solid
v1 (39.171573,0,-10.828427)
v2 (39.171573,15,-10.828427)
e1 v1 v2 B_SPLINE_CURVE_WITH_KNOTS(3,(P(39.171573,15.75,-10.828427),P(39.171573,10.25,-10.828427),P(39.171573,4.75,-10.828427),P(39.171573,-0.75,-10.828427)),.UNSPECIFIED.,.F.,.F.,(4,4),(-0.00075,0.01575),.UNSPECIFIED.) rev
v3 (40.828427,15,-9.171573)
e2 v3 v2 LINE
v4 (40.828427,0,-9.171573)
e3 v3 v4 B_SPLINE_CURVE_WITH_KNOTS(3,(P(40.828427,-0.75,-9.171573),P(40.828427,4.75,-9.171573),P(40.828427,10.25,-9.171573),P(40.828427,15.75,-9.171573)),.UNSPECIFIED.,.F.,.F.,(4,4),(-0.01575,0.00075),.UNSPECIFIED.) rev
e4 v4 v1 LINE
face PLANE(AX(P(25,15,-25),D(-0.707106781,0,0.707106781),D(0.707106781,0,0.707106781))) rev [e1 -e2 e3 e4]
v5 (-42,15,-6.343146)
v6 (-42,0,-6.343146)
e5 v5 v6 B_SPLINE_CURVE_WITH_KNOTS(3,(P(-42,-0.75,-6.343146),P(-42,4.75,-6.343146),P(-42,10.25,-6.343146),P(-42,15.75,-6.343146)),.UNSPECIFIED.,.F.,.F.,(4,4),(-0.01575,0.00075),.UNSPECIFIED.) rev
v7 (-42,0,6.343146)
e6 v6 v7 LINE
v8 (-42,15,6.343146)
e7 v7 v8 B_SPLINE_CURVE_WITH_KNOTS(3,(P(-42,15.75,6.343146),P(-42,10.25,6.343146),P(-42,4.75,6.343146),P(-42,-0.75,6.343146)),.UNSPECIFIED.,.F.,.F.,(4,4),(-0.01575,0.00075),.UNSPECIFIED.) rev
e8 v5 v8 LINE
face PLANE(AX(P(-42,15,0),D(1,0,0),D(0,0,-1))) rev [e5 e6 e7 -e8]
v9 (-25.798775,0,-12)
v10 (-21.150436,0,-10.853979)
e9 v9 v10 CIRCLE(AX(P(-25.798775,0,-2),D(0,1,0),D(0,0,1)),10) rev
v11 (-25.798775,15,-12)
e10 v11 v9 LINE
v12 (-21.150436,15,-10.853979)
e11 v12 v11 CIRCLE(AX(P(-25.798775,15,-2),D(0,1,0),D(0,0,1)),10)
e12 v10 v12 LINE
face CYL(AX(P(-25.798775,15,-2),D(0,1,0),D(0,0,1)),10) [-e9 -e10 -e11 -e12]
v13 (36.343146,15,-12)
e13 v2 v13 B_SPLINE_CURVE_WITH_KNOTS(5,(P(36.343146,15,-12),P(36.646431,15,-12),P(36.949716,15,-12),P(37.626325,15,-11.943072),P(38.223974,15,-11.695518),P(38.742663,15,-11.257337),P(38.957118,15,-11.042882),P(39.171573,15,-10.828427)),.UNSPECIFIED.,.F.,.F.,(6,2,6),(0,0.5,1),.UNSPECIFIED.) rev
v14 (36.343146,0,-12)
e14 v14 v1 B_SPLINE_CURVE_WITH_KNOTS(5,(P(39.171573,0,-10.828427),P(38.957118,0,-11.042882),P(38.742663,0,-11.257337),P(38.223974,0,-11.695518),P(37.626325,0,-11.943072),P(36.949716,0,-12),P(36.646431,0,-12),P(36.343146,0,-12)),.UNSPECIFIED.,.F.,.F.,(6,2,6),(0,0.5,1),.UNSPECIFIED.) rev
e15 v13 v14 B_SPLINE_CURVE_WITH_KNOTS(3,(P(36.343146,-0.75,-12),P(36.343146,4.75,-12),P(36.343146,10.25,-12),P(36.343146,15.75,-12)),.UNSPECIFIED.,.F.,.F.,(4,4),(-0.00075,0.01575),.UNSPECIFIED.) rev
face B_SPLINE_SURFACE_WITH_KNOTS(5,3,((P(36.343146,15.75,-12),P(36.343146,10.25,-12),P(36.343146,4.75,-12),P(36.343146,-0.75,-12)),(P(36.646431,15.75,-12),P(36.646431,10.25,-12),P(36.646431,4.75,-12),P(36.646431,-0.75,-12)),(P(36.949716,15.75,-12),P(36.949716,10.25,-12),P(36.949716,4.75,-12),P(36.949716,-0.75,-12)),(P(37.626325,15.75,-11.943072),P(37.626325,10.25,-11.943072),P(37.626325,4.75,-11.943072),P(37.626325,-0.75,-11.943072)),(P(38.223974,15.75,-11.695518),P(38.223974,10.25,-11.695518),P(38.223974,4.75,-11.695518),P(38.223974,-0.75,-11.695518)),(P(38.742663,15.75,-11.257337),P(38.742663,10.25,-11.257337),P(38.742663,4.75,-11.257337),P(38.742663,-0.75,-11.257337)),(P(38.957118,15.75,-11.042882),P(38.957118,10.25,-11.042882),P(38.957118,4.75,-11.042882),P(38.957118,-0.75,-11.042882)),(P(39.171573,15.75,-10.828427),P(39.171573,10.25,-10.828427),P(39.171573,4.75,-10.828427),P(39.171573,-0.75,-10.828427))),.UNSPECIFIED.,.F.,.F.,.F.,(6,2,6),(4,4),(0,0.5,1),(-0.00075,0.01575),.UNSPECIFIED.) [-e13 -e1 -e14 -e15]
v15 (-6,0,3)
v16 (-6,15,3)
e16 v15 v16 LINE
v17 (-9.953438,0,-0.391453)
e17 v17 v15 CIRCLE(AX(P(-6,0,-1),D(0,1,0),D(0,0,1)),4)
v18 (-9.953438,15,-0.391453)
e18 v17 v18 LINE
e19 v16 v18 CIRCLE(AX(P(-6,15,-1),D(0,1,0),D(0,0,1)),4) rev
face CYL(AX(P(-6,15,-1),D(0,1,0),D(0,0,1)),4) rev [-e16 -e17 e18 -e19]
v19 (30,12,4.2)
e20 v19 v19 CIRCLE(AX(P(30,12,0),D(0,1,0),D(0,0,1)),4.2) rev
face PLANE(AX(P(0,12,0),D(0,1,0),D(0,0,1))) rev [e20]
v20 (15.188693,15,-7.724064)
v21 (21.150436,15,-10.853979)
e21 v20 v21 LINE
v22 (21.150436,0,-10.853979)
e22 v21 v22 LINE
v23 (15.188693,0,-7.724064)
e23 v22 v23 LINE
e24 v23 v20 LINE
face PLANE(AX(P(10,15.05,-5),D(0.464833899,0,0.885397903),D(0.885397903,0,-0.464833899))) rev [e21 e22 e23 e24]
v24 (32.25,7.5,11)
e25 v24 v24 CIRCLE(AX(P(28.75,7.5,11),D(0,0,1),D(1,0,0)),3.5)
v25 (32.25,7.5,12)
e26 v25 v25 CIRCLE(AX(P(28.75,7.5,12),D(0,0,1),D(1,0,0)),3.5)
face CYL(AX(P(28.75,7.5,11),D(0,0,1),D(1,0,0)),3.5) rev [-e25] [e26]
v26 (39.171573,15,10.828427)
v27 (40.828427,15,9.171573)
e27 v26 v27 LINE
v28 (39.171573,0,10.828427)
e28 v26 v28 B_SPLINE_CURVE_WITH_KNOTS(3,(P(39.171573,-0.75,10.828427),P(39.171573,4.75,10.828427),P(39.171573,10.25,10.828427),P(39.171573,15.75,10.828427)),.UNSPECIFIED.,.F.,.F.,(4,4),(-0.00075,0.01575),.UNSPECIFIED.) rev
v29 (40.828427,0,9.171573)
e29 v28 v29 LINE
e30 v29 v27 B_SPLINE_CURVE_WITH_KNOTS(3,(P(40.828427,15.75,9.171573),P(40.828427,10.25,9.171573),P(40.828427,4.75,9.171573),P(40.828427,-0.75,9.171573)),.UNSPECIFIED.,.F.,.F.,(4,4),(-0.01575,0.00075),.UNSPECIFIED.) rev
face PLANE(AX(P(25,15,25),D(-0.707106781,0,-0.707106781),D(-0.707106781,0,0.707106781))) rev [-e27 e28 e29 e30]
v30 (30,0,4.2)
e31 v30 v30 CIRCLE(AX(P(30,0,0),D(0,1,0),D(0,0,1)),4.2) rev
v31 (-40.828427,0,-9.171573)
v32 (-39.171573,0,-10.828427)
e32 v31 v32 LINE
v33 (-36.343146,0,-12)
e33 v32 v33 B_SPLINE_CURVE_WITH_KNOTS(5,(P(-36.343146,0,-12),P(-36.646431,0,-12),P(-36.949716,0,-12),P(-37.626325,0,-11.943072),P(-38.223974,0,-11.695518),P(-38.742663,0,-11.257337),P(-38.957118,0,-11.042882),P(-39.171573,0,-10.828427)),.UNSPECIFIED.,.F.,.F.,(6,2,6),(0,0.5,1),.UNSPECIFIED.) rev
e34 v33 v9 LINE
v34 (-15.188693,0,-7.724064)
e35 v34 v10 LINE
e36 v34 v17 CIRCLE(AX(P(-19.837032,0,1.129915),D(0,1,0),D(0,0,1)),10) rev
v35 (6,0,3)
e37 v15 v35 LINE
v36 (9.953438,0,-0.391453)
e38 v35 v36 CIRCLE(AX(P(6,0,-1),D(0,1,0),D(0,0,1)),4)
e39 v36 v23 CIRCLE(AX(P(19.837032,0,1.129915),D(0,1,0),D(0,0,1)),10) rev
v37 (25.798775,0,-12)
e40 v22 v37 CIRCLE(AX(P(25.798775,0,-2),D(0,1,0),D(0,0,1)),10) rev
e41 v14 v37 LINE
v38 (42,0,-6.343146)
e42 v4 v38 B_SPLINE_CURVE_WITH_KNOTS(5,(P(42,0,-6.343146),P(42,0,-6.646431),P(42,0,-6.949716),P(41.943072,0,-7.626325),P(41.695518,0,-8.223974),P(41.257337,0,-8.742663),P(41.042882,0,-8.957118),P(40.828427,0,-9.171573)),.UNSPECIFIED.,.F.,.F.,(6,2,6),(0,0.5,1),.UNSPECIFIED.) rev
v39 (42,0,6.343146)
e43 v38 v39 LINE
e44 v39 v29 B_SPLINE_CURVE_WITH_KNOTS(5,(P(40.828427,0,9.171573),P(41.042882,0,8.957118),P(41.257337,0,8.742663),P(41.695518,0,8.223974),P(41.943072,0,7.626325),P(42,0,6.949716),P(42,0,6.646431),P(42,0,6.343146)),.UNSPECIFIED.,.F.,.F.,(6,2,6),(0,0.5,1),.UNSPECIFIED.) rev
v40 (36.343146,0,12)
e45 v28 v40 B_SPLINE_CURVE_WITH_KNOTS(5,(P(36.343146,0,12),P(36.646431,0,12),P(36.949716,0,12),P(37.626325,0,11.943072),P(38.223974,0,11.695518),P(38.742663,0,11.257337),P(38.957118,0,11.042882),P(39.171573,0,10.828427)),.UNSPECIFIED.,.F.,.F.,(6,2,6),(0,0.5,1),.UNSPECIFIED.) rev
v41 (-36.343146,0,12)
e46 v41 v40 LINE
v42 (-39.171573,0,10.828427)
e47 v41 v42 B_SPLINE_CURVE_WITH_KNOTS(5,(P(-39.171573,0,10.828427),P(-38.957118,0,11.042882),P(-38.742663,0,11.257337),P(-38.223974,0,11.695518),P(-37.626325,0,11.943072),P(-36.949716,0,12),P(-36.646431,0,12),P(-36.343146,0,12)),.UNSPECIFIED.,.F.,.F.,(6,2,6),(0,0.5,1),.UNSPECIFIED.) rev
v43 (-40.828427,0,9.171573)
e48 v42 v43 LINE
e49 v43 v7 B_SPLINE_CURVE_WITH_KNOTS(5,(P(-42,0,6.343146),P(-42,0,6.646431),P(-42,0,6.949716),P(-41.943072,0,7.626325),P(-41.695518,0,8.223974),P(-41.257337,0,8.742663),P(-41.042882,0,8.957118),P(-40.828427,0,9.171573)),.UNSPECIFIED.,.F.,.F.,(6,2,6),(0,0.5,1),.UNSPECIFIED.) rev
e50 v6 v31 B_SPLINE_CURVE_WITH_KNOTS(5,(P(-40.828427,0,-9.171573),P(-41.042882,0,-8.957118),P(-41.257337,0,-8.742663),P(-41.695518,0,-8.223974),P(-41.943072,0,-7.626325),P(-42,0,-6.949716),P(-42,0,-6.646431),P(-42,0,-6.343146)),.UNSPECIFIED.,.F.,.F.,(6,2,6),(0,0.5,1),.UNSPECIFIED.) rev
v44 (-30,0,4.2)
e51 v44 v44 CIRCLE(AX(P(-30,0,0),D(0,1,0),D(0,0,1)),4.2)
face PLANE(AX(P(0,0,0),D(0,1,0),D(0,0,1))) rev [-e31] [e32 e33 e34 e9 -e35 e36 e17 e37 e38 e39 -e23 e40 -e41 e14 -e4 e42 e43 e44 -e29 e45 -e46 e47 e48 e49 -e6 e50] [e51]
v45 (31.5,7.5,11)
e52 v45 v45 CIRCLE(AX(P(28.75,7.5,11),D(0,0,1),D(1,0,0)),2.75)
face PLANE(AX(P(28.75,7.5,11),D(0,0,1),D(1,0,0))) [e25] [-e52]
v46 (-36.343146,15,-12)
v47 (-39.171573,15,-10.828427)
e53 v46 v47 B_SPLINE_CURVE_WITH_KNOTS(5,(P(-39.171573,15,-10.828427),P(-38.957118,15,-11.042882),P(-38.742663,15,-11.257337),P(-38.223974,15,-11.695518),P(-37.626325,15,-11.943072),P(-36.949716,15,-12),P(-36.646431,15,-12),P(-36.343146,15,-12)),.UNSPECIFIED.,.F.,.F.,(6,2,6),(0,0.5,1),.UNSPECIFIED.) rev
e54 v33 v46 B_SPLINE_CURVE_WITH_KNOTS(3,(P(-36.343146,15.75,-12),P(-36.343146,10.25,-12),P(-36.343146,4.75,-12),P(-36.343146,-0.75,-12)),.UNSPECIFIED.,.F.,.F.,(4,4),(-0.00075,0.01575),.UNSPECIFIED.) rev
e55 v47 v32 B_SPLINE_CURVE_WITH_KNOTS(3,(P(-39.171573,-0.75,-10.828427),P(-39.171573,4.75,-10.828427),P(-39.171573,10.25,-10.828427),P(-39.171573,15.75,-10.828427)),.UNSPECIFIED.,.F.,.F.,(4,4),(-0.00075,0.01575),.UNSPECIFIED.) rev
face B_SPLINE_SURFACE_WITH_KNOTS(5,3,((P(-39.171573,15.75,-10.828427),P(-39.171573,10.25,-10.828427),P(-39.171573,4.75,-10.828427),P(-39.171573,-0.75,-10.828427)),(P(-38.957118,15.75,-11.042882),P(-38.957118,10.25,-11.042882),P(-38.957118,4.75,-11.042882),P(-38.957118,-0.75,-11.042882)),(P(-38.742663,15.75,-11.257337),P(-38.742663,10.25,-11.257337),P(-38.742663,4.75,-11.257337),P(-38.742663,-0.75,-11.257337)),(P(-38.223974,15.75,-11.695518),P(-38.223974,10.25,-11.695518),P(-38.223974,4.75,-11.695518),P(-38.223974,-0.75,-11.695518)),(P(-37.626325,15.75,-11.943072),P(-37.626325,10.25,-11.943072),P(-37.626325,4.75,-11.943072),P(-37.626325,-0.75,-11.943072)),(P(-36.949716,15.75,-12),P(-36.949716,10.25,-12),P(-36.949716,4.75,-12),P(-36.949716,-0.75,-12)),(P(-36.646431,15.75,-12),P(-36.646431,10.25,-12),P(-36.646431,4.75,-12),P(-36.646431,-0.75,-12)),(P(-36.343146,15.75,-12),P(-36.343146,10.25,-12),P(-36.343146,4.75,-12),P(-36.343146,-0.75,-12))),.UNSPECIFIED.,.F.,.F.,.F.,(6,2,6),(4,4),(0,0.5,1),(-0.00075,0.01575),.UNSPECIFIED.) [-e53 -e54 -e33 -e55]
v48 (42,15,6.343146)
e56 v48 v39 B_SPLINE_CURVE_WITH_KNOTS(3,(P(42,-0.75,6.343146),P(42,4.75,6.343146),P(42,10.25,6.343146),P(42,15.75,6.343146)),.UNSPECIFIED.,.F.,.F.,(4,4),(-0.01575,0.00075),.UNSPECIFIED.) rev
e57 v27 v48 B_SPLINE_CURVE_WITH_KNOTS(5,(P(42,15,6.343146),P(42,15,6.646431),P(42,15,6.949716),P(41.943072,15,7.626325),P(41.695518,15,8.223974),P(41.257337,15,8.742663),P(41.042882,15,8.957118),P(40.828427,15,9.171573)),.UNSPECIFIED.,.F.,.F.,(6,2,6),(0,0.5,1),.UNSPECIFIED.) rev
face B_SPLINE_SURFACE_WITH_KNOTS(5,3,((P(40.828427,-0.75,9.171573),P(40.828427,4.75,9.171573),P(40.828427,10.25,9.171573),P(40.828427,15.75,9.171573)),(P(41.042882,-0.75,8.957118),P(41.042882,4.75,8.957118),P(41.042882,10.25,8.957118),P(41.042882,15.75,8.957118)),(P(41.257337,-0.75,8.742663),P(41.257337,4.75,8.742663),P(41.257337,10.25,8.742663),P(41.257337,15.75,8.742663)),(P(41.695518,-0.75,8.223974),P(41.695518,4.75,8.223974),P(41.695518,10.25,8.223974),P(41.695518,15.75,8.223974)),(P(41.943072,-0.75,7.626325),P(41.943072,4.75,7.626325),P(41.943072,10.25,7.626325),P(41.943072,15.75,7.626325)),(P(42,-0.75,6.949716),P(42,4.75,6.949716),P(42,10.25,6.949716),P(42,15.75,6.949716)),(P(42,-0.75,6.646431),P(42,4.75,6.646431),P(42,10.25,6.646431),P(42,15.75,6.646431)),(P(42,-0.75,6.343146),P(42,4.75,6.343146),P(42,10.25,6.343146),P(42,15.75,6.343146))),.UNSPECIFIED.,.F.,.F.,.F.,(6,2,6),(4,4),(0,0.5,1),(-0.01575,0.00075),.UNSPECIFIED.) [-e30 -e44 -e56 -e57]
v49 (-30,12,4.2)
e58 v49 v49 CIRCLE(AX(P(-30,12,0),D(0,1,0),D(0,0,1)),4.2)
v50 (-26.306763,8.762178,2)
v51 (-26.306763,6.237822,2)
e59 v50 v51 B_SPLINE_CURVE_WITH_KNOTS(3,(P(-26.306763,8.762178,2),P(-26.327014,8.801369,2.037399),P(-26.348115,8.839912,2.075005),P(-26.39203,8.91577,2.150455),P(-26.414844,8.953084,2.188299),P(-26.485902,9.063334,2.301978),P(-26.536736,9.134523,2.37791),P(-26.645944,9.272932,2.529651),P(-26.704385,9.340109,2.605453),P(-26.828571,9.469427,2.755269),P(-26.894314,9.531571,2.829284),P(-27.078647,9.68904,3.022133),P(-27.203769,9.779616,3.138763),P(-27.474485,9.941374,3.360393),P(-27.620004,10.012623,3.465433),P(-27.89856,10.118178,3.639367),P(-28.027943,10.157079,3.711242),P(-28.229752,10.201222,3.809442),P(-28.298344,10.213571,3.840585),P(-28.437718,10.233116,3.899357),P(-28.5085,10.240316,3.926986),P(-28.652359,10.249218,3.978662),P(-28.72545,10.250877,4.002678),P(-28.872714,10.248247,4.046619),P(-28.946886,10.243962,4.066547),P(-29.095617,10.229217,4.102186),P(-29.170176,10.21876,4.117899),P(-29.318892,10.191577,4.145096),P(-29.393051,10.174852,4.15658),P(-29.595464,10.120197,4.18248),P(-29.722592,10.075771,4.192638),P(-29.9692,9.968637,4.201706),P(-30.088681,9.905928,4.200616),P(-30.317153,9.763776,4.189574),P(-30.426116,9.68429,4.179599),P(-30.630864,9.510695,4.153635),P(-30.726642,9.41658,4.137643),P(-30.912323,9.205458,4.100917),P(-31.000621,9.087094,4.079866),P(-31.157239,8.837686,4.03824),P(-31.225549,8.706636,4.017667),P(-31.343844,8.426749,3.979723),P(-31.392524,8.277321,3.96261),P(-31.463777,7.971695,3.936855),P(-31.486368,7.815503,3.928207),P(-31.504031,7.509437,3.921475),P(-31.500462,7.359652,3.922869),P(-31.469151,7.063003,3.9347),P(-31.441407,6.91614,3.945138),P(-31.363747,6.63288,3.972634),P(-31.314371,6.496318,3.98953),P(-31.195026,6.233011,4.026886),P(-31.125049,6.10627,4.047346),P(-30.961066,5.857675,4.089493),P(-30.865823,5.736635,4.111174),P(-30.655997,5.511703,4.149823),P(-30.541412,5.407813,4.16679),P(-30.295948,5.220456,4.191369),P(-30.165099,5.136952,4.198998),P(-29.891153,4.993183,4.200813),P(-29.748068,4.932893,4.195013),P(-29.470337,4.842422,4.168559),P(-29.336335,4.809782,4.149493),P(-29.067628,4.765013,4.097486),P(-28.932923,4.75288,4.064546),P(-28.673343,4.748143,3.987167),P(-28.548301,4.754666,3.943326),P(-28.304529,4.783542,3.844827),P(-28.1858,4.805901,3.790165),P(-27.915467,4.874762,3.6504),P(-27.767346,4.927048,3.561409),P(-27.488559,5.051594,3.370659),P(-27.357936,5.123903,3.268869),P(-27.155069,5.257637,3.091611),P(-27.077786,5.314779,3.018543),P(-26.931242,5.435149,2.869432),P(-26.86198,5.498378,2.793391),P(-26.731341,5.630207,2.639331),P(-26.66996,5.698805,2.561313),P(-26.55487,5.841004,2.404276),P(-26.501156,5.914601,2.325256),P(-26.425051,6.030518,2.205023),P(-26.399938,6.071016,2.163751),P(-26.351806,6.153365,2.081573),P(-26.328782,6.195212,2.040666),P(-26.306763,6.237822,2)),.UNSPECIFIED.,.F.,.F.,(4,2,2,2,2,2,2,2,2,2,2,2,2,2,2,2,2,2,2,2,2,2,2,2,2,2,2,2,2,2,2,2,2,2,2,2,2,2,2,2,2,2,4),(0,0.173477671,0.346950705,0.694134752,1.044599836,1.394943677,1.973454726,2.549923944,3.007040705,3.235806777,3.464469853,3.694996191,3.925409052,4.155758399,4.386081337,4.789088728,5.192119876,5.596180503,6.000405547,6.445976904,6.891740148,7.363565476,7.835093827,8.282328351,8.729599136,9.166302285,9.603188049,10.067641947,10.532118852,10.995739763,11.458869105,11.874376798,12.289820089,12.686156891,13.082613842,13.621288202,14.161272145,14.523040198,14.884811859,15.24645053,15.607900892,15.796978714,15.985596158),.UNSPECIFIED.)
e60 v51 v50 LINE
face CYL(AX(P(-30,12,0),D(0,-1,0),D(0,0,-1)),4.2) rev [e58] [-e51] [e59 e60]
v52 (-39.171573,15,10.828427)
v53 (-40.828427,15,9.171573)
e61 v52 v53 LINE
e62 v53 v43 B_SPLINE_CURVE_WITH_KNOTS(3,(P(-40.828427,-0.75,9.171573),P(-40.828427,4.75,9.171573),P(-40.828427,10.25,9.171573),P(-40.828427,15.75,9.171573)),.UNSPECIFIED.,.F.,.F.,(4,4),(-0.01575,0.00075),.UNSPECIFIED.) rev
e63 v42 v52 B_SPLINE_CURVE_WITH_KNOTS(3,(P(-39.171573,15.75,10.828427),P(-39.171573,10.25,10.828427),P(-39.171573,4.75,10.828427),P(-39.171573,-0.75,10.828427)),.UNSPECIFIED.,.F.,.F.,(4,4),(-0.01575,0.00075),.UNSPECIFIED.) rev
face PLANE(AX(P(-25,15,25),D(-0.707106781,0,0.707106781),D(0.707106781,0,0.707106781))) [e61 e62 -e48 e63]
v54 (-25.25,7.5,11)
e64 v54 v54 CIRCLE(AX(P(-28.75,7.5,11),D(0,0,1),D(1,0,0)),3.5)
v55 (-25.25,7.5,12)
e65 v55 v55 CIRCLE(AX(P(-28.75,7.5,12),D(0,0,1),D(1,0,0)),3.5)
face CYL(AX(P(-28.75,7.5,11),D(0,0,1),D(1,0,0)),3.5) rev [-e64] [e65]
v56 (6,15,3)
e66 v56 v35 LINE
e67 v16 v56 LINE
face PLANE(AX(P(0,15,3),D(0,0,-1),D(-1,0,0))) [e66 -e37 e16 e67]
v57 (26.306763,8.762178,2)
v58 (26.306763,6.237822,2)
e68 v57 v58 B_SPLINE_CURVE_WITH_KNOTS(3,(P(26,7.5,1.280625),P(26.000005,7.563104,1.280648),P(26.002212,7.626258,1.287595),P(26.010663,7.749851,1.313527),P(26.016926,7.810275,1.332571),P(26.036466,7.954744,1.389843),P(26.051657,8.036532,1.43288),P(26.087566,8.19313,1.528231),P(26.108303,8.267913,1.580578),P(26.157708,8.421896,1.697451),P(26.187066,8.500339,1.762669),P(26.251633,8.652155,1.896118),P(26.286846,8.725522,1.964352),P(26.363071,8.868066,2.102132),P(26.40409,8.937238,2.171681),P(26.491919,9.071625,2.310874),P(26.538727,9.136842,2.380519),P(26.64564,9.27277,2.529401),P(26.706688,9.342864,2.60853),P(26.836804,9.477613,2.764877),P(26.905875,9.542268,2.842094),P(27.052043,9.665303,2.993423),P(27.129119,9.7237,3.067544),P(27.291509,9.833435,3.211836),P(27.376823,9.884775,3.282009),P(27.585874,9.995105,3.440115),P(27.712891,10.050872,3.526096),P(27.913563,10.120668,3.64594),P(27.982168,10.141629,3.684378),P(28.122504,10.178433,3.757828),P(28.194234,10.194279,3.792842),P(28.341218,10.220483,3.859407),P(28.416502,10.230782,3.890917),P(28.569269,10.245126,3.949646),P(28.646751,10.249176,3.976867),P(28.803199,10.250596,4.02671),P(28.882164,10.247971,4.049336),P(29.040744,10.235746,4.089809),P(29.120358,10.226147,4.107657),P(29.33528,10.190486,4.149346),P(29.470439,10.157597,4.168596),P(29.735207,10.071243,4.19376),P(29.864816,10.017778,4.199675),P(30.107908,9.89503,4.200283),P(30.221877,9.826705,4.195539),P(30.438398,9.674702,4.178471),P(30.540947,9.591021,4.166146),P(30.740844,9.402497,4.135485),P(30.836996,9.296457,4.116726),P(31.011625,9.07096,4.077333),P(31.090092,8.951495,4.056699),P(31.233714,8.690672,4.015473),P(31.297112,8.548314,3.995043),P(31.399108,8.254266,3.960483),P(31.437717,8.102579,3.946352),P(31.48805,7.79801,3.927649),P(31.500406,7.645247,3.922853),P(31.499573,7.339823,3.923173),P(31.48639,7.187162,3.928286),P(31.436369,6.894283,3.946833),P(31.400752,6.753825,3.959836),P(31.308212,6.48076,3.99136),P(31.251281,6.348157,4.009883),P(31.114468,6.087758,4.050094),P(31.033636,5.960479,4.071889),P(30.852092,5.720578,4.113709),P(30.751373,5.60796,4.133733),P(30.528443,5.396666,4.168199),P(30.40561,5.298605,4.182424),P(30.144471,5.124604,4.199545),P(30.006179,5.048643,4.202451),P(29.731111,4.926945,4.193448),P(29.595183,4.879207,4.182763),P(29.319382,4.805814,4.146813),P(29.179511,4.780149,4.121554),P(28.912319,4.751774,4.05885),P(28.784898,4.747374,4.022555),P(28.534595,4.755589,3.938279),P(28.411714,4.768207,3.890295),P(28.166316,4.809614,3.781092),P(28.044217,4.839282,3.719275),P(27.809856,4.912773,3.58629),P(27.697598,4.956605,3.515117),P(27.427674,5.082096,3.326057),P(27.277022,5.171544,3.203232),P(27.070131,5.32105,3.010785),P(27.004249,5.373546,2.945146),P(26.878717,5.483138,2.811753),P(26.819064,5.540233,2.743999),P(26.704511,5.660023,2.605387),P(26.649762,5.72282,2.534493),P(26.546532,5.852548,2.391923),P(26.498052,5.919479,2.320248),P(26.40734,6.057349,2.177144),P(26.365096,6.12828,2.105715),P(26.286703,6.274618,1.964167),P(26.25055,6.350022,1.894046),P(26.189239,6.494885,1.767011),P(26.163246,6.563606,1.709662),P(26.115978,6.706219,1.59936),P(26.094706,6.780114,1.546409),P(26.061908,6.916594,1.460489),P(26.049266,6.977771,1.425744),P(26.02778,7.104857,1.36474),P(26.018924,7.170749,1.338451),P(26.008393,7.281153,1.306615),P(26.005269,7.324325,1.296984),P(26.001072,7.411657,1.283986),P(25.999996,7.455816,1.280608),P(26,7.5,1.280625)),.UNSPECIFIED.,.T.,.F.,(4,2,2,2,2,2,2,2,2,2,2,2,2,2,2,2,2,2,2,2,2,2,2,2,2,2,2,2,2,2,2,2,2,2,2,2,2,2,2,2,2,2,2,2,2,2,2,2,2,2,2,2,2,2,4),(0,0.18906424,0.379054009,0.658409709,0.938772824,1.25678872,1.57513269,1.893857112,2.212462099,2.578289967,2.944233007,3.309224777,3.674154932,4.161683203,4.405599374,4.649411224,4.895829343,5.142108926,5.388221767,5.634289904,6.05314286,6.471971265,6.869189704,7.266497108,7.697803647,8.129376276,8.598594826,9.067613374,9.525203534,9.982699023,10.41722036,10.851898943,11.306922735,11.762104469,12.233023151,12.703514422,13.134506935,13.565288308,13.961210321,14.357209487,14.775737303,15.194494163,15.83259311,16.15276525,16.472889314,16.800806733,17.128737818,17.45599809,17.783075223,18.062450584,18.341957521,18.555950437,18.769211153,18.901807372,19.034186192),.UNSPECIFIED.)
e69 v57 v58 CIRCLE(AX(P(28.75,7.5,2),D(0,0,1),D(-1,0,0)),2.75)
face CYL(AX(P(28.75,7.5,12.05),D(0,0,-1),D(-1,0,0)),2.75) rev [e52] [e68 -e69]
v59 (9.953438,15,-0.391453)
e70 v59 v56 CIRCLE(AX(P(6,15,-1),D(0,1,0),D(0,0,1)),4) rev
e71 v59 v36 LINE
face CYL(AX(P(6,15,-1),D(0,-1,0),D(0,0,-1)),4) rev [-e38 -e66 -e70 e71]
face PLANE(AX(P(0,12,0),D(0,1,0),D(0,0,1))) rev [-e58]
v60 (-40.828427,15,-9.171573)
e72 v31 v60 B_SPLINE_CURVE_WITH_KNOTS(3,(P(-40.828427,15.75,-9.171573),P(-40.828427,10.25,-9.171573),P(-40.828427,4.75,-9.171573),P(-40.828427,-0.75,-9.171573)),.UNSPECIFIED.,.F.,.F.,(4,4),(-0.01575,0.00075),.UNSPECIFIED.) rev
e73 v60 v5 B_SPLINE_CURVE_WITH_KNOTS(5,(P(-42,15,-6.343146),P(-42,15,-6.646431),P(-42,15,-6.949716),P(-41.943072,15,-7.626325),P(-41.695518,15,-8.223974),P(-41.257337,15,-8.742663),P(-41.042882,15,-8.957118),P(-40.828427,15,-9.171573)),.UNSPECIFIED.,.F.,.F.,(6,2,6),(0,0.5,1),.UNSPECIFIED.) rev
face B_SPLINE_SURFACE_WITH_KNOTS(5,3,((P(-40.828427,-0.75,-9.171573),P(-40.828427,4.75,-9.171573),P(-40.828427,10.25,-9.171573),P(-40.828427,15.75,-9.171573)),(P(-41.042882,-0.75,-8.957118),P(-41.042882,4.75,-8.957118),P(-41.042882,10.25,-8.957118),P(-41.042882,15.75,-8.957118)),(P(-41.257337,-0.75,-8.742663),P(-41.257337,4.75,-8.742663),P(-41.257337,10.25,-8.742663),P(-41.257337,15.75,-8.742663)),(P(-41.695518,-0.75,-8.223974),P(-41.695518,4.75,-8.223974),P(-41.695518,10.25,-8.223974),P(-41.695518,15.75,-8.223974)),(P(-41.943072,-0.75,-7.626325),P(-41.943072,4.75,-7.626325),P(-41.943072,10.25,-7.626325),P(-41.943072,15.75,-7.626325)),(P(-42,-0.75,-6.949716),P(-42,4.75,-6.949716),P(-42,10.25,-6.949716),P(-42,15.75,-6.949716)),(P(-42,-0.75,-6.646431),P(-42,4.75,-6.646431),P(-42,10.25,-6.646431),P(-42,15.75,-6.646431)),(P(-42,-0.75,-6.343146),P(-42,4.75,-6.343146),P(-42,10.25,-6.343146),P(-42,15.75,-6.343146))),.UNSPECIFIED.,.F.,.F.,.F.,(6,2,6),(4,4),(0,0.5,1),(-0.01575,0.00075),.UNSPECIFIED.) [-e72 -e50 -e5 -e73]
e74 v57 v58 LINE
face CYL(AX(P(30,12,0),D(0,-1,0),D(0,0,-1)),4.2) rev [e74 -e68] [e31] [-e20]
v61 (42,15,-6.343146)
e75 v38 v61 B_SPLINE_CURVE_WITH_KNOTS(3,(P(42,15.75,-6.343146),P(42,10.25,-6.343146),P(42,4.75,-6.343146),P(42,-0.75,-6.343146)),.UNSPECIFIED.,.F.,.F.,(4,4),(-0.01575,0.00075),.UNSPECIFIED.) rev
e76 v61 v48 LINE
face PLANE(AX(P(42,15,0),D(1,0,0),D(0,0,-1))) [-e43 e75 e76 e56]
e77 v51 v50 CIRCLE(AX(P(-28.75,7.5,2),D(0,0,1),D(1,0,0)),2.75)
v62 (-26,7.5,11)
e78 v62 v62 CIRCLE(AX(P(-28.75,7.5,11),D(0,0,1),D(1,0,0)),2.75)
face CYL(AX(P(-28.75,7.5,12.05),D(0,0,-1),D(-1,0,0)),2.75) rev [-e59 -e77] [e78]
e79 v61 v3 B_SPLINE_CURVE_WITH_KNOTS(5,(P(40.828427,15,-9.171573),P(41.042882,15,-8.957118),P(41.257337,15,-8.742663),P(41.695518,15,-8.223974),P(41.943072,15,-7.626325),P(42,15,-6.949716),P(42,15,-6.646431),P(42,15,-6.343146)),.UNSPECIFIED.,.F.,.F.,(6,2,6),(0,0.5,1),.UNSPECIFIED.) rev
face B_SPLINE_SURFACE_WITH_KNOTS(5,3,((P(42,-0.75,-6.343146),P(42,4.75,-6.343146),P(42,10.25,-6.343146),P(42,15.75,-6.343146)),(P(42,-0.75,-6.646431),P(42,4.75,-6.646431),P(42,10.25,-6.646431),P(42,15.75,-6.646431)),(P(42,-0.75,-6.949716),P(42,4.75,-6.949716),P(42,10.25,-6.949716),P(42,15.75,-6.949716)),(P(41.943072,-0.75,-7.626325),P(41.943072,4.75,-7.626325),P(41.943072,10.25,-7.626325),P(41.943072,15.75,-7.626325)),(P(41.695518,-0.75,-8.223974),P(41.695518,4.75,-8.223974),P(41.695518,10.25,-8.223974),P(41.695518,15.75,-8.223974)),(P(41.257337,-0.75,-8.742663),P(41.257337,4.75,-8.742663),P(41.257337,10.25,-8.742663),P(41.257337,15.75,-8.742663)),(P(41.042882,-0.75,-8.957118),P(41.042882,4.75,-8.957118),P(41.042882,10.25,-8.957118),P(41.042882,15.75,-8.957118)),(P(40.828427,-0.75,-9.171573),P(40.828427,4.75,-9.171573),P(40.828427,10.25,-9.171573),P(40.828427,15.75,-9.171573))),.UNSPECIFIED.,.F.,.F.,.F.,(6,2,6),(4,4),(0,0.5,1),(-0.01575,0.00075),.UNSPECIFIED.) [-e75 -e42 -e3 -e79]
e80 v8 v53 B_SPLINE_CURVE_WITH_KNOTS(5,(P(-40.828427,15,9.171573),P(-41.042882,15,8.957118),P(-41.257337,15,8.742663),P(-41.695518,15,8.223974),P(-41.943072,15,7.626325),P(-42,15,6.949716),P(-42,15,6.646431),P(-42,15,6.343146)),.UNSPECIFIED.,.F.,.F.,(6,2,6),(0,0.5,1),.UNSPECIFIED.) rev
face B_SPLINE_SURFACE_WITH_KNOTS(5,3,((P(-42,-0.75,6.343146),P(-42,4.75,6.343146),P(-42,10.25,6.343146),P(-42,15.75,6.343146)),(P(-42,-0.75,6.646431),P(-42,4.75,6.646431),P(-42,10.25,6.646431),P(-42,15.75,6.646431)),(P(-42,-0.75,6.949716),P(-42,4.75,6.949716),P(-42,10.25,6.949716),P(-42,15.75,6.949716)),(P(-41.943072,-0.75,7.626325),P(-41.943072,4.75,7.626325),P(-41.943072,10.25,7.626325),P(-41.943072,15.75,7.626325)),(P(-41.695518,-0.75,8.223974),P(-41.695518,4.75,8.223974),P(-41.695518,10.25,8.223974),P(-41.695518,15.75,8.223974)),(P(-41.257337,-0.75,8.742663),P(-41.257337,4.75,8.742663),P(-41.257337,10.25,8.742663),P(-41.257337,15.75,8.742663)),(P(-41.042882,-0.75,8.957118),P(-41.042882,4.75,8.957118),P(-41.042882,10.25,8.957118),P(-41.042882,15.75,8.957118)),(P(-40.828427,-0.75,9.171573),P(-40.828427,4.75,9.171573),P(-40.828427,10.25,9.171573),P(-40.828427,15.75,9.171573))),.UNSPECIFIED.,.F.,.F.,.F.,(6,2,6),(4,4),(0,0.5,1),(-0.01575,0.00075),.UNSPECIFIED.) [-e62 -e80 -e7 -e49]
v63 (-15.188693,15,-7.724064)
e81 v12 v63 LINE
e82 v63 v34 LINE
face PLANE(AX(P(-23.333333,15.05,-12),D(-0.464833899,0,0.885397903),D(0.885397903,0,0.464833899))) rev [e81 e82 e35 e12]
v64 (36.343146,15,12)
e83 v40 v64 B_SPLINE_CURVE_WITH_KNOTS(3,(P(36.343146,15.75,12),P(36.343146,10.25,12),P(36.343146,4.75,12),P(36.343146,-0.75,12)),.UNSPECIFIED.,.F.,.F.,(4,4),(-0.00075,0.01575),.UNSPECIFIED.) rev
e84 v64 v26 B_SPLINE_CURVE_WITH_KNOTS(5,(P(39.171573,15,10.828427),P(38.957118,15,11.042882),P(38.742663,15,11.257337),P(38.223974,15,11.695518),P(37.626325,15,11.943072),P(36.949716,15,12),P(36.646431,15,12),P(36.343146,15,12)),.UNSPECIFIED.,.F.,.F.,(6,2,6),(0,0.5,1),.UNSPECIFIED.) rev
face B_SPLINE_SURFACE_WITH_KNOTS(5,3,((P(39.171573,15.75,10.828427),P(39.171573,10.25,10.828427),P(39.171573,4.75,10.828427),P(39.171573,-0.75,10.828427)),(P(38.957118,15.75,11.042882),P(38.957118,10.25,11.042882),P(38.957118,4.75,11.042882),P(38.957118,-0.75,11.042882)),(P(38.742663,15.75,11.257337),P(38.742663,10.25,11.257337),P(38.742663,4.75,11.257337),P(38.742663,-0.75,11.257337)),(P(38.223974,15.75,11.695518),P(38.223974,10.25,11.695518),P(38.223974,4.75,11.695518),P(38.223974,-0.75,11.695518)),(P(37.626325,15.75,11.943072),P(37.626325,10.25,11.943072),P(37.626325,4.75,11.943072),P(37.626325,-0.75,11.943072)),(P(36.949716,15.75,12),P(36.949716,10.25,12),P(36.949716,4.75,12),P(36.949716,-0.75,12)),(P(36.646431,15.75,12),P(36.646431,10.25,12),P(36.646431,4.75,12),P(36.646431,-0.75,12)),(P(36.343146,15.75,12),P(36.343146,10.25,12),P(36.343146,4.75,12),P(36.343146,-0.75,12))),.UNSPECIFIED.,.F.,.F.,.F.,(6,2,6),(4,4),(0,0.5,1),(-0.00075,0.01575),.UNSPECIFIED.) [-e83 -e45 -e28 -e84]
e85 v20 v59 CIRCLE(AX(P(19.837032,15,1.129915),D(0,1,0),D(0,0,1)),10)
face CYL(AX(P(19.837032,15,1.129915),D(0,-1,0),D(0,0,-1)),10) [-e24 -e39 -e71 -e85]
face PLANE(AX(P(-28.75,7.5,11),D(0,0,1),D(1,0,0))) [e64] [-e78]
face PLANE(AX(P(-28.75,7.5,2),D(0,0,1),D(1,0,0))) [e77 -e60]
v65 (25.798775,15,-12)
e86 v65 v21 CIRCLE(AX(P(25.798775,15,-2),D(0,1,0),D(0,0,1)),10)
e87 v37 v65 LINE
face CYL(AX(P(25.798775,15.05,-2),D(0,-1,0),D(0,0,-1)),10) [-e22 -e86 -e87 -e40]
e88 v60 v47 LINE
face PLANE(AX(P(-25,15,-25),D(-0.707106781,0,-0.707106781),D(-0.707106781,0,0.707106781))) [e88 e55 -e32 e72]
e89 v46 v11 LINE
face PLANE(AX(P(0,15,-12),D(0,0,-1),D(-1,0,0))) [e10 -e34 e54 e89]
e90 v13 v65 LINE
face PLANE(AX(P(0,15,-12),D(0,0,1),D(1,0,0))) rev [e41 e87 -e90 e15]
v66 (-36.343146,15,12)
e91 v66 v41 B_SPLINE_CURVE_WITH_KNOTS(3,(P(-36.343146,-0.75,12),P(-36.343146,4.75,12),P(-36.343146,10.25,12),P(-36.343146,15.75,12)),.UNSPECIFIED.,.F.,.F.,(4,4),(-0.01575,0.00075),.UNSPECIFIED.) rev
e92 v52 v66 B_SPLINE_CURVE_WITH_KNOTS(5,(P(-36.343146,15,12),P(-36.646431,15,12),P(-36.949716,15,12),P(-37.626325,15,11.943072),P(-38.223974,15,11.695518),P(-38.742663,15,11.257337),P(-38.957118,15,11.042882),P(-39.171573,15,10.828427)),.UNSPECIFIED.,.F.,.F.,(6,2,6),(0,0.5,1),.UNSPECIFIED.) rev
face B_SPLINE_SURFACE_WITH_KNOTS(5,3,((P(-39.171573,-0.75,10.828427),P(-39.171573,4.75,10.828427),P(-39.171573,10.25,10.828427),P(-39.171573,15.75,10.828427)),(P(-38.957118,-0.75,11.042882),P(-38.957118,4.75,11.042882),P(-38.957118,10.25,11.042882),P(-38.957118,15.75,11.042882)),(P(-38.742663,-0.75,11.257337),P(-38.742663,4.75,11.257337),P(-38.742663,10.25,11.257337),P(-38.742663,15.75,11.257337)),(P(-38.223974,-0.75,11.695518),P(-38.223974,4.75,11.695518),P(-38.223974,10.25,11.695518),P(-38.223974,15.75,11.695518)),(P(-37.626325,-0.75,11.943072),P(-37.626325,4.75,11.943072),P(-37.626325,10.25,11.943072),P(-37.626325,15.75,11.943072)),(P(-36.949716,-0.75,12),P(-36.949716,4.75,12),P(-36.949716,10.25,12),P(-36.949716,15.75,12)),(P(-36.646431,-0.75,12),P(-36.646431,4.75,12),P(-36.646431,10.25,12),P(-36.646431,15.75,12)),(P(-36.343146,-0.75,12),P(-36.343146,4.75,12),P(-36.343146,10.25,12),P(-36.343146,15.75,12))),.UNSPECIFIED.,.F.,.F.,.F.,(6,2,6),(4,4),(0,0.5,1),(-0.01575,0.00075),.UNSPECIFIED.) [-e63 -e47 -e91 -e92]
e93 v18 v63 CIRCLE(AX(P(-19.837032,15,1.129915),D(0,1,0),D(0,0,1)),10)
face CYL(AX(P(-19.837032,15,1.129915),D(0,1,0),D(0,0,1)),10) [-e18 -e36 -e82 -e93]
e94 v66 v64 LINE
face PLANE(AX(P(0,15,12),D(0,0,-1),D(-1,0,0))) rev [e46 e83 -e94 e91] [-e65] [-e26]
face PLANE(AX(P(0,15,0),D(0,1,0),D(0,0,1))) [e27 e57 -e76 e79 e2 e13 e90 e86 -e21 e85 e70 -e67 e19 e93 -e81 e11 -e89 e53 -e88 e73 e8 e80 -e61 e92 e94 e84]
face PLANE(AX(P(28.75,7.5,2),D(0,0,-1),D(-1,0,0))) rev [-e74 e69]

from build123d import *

# Parameters (mm, degrees)
ESQUISSE1_W                  = 20
ESQUISSE1_H                  = 12
BOSS_EXTRU_1_DEPTH           = 15
ESQUISSE1_4_R                = 4.2
ENL_V_MAT_EXTRU_1_DEPTH      = 12
CONG_2_R                     = 4
ENL_V_MAT_EXTRU_2_DEPTH      = 54.749418763
ENL_V_MAT_EXTRU_2_DEPTH_BACK = 10
ESQUISSE2_R                  = 2.75
ESQUISSE4_R                  = 3.5
ENL_V_MAT_EXTRU_3_DEPTH      = 1
ESQUISSE5_R                  = 3.5
ENL_V_MAT_EXTRU_4_DEPTH      = 1
ENL_V_MAT_EXTRU_5_DEPTH      = 49.093658782
CONG_3_R                     = 10


with BuildPart() as part:
    # Esquisse1 → Boss.-Extru.1 (new body)
    with BuildSketch(Plane(origin=(0, 0, 0), x_dir=(1, 0, 0), z_dir=(0, 1, 0))):
        Polygon((-38, 12), (-42, 8), (-42, -8), (-38, -12), (38, -12), (42, -8), (42, 8), (38, 12), (22, 12), (14, 18), (-14, 18), (-22, 12), align=None)
        with Locations((0, 3)):
            Rectangle(ESQUISSE1_W, ESQUISSE1_H, mode=Mode.SUBTRACT)
    extrude(amount=BOSS_EXTRU_1_DEPTH)

    # Congé1
    # a fillet whose section is not a circle: 4 mm, written as the material it adds along each edge
    with BuildSketch(Plane(origin=(22, 0, -12), x_dir=(1, 0, 0), z_dir=(0, 1, 0)), Plane(origin=(-22, 0, -12), x_dir=(0.7999999999999996, 0, -0.6000000000000003), z_dir=(0, 1, 0))) as cong_1_piece_1:
        with BuildLine():
            add(Edge.make_bspline([(1.333333333, 0), (1.087283439, 0), (0.841233545, 0), (0.292751215, 0.037020099), (-0.211988912, 0.205266808), (-0.672986836, 0.504740127), (-0.869826751, 0.652370064), (-1.066666667, 0.8)], knots=[0, 0, 0, 0, 0, 0, 0.5, 0.5, 1, 1, 1, 1, 1, 1], degree=5))
            Line((-1.066666667, 0.8), (0, 0))
            Line((0, 0), (1.333333333, 0))
        make_face()
    extrude(amount=15)
    # a fillet whose section is not a circle: 4 mm, written as the material it takes off along each edge
    with BuildSketch(Plane(origin=(42, -4.142135624, 8), x_dir=(-0.707106781186547, 0, 0.7071067811865481), z_dir=(0, 1, 0)), Plane(origin=(38, -4.142135624, 12), x_dir=(-1, 0, 0), z_dir=(0, 1, 0)), Plane(origin=(42, -4.142135624, -8), x_dir=(0, 0, 1), z_dir=(0, 1, 0)), Plane(origin=(38, -4.142135624, -12), x_dir=(0.7071067811865481, 0, 0.707106781186547), z_dir=(0, 1, 0)), Plane(origin=(-42, -4.142135624, -8), x_dir=(0.7071067811865475, 0, -0.7071067811865475), z_dir=(0, 1, 0)), Plane(origin=(-42, -4.142135624, 8), x_dir=(0, 0, -1), z_dir=(0, 1, 0)), Plane(origin=(-38, -4.142135624, 12), x_dir=(-0.7071067811865465, 0, -0.7071067811865486), z_dir=(0, 1, 0))) as cong_1_2_piece_1:
        with BuildLine():
            add(Edge.make_bspline([(1.656854249, 0), (1.35356905, 0), (1.050283851, 0), (0.373674798, -0.056927592), (-0.223974097, -0.30448187), (-0.742662833, -0.742662833), (-0.957117854, -0.957117854), (-1.171572875, -1.171572875)], knots=[0, 0, 0, 0, 0, 0, 0.5, 0.5, 1, 1, 1, 1, 1, 1], degree=5))
            Line((-1.171572875, -1.171572875), (0, 0))
            Line((0, 0), (1.656854249, 0))
        make_face()
    extrude(amount=23.284271247, mode=Mode.SUBTRACT)
    with BuildSketch(Plane(origin=(14, -3.333333333, -18), x_dir=(0.7999999999999996, 0, 0.6000000000000003), z_dir=(0, 1, 0)), Plane(origin=(-14, -3.333333333, -18), x_dir=(1, 0, 0), z_dir=(0, 1, 0))) as cong_1_2_piece_2:
        with BuildLine():
            add(Edge.make_bspline([(1.333333333, 0), (1.087283439, 0), (0.841233545, 0), (0.292751215, -0.037020099), (-0.211988912, -0.205266808), (-0.672986836, -0.504740127), (-0.869826751, -0.652370064), (-1.066666667, -0.8)], knots=[0, 0, 0, 0, 0, 0, 0.5, 0.5, 1, 1, 1, 1, 1, 1], degree=5))
            Line((-1.066666667, -0.8), (0, 0))
            Line((0, 0), (1.333333333, 0))
        make_face()
    extrude(amount=21.666666667, mode=Mode.SUBTRACT)
    with BuildSketch(Plane(origin=(-38, -4.142135624, -12), x_dir=(-0.7071067811865465, 0, 0.7071067811865486), z_dir=(0, 1, 0))) as cong_1_2_piece_3:
        with BuildLine():
            add(Edge.make_bspline([(1.656854249, 0), (1.35356905, 0), (1.050283851, 0), (0.373674798, 0.056927592), (-0.223974097, 0.30448187), (-0.742662833, 0.742662833), (-0.957117854, 0.957117854), (-1.171572875, 1.171572875)], knots=[0, 0, 0, 0, 0, 0, 0.5, 0.5, 1, 1, 1, 1, 1, 1], degree=5))
            Line((-1.171572875, 1.171572875), (0, 0))
            Line((0, 0), (1.656854249, 0))
        make_face()
    extrude(amount=23.284271247, mode=Mode.SUBTRACT)

    # Esquisse1<4> → Enlèv. mat.-Extru.1 (cut)
    with BuildSketch(Plane(origin=(0, 0, 0), x_dir=(1, 0, 0), z_dir=(0, 1, 0))):
        with Locations(Location((-30, 0, 0), (0, 0, 270))):
            Circle(ESQUISSE1_4_R)
        with Locations(Location((30, 0, 0), (0, 0, 270))):
            Circle(ESQUISSE1_4_R)
    extrude(amount=ENL_V_MAT_EXTRU_1_DEPTH, mode=Mode.SUBTRACT)

    # Congé2
    cong_2_edges = [part.edges().sort_by_distance(p)[0] for p in [
        (-10, 7.5, -9),
        (-10, 7.5, 3),
        (10, 7.5, 3),
        (10, 7.5, -9),
    ]]
    fillet(cong_2_edges, radius=CONG_2_R)

    # Esquisse2 → Enlèv. mat.-Extru.2 (cut, two sides: drawn at the far end of the back side and taken through both)
    with BuildSketch(Plane.XY.offset(12).offset(-ENL_V_MAT_EXTRU_2_DEPTH_BACK)):
        with Locations(Location((-28.75, 7.5, 0), (0, 0, 180))):
            Circle(ESQUISSE2_R)
        with Locations(Location((28.75, 7.5, 0), (0, 0, 180))):
            Circle(ESQUISSE2_R)
    extrude(amount=ENL_V_MAT_EXTRU_2_DEPTH + ENL_V_MAT_EXTRU_2_DEPTH_BACK, mode=Mode.SUBTRACT)

    # Esquisse4 → Enlèv. mat.-Extru.3 (cut)
    with BuildSketch(Plane.XY.offset(12)):
        with Locations((28.75, 7.5)):
            Circle(ESQUISSE4_R)
    extrude(amount=-ENL_V_MAT_EXTRU_3_DEPTH, mode=Mode.SUBTRACT)

    # Esquisse5 → Enlèv. mat.-Extru.4 (cut)
    with BuildSketch(Plane.XY.offset(12)):
        with Locations((-28.75, 7.5)):
            Circle(ESQUISSE5_R)
    extrude(amount=-ENL_V_MAT_EXTRU_4_DEPTH, mode=Mode.SUBTRACT)

    # Esquisse6 → Enlèv. mat.-Extru.5 (cut, through all)
    with BuildSketch(Plane.XZ):
        Polygon((-23.333333333, -12), (-10, -5), (10, -5), (23.333333333, -12), (23.333333333, -18), (-23.333333333, -18), align=None)
    extrude(amount=-ENL_V_MAT_EXTRU_5_DEPTH, mode=Mode.SUBTRACT)

    # Congé3
    cong_3_edges = [part.edges().sort_by_distance(p)[0] for p in [
        (-23.333333333, 7.5, -12),
        (-10, 7.5, -5),
        (10, 7.5, -5),
        (23.333333333, 7.5, -12),
    ]]
    fillet(cong_3_edges, radius=CONG_3_R)


solid = part.part
